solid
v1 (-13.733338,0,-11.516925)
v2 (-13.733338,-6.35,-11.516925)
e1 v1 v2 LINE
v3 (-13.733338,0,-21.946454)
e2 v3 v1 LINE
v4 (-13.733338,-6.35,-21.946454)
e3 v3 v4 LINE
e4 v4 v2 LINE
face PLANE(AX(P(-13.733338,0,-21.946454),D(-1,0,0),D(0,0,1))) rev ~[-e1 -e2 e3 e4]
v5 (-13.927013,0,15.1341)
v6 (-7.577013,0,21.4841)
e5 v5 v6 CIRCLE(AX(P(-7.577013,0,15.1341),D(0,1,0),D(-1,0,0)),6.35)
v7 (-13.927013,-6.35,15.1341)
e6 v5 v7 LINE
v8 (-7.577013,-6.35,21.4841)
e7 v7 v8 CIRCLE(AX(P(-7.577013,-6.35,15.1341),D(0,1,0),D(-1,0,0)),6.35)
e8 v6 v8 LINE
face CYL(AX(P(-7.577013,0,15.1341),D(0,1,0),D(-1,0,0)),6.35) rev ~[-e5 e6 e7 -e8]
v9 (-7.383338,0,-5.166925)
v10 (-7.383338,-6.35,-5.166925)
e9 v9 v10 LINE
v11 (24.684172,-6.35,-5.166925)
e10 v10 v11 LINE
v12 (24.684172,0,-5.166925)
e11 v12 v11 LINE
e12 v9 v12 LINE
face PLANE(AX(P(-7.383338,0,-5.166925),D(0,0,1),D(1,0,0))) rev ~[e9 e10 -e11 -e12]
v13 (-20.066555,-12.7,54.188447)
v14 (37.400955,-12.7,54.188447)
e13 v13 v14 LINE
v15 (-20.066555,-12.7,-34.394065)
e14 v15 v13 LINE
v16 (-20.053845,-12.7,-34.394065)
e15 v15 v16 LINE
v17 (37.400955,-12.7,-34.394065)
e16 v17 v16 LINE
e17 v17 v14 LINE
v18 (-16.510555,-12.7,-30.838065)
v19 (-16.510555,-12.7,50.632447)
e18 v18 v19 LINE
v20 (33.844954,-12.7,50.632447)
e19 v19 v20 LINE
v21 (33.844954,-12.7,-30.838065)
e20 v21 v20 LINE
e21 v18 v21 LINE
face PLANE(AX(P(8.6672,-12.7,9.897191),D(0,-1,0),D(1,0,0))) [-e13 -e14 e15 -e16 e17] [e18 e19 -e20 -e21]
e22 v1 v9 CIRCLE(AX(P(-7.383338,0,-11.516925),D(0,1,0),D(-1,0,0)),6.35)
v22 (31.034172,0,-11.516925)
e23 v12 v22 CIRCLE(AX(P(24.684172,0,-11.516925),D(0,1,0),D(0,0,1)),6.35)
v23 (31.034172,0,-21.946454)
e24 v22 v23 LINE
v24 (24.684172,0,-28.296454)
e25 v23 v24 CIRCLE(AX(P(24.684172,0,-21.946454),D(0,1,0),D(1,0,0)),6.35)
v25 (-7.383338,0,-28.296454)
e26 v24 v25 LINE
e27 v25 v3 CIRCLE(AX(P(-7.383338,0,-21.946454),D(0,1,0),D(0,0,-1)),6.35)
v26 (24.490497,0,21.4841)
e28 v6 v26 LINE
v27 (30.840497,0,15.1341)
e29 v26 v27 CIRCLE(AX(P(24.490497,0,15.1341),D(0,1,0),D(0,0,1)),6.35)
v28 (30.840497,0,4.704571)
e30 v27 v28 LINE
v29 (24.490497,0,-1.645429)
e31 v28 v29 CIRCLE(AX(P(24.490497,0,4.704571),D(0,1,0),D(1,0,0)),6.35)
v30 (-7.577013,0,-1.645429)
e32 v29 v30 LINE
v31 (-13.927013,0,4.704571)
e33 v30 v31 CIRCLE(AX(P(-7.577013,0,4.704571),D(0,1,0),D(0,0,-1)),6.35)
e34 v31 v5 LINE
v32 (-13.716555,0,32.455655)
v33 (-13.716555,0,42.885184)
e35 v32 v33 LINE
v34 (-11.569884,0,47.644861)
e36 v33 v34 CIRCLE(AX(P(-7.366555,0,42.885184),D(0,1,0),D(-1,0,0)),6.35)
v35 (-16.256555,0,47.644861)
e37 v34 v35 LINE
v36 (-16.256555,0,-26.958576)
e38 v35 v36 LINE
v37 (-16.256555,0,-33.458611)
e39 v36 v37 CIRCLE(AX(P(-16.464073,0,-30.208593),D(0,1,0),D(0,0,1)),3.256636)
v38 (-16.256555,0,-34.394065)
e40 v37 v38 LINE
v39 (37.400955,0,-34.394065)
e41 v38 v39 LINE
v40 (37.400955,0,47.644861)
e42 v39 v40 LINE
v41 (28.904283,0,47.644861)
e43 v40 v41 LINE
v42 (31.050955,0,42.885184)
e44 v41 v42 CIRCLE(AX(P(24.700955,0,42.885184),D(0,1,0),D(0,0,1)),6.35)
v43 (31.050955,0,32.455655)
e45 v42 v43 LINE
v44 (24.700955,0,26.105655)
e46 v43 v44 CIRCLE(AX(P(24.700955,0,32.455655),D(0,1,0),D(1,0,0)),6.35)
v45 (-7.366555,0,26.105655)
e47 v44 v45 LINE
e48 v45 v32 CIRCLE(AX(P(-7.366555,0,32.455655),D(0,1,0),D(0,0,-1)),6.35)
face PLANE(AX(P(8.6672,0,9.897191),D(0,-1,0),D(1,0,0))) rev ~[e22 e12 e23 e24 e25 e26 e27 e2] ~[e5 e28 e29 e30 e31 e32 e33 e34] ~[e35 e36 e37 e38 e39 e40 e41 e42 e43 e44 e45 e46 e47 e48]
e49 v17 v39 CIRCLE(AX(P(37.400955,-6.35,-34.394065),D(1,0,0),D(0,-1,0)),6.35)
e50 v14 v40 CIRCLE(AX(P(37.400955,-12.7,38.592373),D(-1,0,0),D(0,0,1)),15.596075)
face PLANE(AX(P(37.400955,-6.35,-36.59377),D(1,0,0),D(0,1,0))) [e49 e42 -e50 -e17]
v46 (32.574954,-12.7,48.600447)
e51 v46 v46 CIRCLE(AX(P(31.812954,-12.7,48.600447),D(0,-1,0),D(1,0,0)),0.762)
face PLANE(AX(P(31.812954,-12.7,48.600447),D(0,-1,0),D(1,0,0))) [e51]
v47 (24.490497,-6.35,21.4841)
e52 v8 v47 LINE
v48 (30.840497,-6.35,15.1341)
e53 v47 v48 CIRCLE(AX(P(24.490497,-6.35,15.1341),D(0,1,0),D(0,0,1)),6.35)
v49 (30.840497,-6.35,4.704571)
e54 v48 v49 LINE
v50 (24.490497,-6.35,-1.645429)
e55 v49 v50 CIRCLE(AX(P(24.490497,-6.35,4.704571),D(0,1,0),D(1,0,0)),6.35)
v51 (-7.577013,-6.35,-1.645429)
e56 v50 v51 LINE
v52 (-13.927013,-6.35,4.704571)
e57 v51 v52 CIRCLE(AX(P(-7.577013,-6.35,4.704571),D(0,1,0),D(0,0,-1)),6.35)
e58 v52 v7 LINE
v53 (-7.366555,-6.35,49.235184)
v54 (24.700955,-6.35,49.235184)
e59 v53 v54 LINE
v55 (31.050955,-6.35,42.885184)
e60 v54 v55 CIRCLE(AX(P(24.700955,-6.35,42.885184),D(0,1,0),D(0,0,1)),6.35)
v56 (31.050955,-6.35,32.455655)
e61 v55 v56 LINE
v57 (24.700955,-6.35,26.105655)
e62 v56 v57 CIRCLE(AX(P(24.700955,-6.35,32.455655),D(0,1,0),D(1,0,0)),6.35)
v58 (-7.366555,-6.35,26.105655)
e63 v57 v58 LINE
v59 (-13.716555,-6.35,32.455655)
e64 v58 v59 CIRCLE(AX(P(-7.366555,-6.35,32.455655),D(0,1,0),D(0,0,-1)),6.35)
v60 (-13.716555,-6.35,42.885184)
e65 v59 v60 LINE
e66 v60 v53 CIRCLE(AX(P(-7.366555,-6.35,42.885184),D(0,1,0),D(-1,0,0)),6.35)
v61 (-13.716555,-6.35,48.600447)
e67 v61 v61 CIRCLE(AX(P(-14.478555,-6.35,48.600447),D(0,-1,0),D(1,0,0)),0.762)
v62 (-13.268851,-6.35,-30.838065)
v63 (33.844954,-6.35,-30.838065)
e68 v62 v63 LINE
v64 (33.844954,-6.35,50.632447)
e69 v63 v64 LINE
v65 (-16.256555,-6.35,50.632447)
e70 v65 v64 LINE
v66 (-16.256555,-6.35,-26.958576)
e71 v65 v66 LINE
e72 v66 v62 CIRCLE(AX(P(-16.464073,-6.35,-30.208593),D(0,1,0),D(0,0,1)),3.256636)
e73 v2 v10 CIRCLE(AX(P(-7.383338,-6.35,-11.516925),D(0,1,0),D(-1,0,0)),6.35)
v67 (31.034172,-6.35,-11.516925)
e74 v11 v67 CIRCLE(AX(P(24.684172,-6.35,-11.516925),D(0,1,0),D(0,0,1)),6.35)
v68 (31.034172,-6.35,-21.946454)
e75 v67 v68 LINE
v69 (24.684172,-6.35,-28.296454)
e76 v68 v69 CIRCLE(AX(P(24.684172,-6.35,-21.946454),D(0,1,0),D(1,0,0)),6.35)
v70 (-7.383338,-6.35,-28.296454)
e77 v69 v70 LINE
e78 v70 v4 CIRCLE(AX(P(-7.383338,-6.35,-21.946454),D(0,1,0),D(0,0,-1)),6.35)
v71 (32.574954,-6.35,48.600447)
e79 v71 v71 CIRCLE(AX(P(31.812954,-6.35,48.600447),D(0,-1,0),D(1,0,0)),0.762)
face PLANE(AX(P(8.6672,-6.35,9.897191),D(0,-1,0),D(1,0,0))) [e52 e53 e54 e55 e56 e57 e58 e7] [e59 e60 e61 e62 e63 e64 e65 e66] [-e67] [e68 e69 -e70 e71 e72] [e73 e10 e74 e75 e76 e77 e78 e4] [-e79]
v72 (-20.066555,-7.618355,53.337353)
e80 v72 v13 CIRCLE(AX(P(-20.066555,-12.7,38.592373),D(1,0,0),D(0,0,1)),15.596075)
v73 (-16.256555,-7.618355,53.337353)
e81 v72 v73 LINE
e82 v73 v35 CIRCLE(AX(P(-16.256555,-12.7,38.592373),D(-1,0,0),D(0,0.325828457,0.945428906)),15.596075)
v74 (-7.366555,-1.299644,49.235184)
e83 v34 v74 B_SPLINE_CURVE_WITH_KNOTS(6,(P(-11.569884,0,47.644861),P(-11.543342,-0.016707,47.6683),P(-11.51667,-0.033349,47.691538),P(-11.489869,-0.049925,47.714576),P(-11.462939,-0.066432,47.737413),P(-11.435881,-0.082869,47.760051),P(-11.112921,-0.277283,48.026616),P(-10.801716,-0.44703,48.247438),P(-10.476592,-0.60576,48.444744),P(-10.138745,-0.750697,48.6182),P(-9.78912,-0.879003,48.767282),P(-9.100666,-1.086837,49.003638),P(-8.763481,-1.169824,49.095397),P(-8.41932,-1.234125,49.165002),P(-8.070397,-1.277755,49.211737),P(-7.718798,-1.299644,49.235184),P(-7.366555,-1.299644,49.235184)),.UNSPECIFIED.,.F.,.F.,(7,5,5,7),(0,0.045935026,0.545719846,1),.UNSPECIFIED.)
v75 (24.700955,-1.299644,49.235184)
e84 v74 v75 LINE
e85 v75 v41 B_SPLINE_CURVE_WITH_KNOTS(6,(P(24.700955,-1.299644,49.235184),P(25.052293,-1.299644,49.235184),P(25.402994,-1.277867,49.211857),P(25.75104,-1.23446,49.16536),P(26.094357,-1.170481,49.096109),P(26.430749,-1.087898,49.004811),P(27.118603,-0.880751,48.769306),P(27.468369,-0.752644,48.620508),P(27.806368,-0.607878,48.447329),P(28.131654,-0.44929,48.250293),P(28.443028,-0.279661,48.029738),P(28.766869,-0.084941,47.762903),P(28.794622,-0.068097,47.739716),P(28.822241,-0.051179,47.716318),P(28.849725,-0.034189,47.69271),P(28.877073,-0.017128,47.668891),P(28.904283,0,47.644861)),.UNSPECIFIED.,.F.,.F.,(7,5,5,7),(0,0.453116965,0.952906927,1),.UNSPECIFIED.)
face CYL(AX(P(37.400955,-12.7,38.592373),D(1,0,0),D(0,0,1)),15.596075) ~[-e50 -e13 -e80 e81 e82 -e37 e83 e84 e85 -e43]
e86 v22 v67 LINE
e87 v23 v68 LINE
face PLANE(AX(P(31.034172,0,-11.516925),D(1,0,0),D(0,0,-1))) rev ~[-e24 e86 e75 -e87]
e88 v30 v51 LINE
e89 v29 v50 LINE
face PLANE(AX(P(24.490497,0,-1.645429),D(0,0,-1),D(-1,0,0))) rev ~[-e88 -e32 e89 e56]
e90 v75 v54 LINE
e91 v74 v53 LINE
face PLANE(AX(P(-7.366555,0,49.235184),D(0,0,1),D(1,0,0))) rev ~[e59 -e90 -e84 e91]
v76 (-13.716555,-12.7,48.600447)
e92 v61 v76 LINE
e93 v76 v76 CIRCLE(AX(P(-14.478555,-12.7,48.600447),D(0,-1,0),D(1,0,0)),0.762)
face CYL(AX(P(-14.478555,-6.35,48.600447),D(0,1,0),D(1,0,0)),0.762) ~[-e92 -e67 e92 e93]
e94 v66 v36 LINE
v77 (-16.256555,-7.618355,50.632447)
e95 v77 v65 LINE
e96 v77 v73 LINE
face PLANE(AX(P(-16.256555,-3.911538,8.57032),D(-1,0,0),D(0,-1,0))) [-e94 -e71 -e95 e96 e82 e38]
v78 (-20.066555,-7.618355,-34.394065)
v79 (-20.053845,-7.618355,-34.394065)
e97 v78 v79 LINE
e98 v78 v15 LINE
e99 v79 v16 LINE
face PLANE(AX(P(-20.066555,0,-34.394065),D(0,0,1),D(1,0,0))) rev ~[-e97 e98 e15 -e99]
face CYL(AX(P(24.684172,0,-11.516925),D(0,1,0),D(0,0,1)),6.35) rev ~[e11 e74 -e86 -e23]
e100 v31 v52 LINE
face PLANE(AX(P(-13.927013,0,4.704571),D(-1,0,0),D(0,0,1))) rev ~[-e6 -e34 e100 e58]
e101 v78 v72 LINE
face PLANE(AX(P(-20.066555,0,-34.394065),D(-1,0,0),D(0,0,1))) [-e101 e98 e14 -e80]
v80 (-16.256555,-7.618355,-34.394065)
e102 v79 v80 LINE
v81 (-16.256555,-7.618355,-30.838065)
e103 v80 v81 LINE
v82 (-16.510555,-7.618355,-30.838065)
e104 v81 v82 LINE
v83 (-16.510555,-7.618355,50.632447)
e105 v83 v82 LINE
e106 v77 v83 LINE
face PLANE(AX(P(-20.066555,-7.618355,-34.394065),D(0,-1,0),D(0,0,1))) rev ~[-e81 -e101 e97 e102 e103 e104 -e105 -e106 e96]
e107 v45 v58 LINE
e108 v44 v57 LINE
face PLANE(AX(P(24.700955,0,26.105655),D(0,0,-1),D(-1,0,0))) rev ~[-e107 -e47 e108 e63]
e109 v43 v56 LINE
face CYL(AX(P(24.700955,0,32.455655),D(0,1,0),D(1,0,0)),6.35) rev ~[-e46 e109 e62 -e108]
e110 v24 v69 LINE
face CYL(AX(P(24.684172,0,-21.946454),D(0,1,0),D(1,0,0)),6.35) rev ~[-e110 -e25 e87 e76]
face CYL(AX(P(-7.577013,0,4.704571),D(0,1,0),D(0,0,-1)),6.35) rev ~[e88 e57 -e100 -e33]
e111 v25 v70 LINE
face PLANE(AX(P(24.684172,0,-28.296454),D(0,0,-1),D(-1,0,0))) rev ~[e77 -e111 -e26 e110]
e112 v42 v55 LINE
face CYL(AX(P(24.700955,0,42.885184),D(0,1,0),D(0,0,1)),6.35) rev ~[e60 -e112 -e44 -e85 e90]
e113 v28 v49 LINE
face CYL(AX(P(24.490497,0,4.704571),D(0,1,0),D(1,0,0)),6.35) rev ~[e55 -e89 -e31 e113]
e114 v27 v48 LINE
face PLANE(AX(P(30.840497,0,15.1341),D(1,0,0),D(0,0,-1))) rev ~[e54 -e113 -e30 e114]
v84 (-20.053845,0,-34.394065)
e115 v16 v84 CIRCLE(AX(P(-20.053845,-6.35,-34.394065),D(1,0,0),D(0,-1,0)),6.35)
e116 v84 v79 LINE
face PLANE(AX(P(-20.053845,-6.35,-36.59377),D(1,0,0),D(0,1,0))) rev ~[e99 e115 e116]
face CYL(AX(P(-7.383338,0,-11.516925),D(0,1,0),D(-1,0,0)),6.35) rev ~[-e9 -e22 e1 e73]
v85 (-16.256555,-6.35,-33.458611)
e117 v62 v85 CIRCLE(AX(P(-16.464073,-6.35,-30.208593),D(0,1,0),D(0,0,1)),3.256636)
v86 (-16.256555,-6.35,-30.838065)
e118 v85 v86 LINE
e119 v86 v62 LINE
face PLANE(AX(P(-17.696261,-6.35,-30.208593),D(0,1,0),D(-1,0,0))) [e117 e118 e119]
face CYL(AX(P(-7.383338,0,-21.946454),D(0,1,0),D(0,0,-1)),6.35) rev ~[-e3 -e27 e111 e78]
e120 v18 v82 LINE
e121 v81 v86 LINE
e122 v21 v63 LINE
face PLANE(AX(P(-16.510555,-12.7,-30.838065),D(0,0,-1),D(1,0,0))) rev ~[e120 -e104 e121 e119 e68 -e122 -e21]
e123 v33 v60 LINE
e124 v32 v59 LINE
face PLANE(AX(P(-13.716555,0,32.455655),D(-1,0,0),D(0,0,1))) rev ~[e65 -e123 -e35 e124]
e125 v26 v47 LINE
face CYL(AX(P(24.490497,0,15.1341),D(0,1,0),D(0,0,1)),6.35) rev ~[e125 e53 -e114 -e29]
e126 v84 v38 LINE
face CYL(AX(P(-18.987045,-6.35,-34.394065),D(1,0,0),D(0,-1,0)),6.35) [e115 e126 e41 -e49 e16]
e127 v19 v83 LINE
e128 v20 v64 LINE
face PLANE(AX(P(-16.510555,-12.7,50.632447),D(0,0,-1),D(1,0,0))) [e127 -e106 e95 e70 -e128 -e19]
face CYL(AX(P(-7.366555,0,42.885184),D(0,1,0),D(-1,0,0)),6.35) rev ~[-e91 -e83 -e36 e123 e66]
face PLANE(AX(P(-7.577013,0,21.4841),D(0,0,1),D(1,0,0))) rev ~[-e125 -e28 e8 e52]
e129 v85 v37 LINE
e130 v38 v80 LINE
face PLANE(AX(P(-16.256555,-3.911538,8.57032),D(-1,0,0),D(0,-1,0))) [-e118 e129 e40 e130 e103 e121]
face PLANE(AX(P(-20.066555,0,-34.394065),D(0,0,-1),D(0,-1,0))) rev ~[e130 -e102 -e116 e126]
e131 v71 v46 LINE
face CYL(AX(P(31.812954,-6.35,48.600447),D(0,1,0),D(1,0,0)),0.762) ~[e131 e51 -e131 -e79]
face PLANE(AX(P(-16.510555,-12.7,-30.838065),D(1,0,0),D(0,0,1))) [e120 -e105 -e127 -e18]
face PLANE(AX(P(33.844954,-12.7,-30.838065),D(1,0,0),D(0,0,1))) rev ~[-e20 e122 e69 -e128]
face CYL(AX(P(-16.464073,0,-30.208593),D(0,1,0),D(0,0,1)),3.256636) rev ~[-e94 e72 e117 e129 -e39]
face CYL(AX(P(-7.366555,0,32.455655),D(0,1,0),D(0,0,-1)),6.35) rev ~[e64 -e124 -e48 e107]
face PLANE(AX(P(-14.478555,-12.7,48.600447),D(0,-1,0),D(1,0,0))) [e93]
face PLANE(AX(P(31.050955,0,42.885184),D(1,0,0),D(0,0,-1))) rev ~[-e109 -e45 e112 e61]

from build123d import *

# Parameters (mm, degrees)
F0_W      = 57.4675095904
F0_H      = 88.5825127872
F1_DEPTH  = 12.7
F3_DEPTH  = 57.4685095904
F4_W      = 50.3555086569
F4_H      = 81.4705118537
F5_DEPTH  = 6.35
F6_R      = 0.7619995332
F8_DEPTH  = 6.35
F11_DEPTH = 56.388
F12_DEPTH = 1.0668
F15_DEPTH = 6.35
F16_DEPTH = 3.81


# Not quite as in the source:
# - a feature of the source that left no trace in its solid (it failed there, or was rolled back) is left out


with BuildPart() as f1:
    # F0 (on Front) → F1 (new body)
    with BuildSketch(Plane.XZ):
        with Locations((8.6671997911, 9.8971910775)):
            Rectangle(F0_W, F0_H)
        with BuildLine():
            ThreePointArc((-13.7333380541, -11.5169252571), (-11.8734661146, -7.0267971965), (-7.3833380541, -5.1669252571))
            Line((-7.3833380541, -5.1669252571), (24.6841715364, -5.1669252571))
            ThreePointArc((24.6841715364, -5.1669252571), (29.1742995969, -7.0267971965), (31.0341715364, -11.5169252571))
            Line((31.0341715364, -11.5169252571), (31.0341715364, -21.9464536455))
            ThreePointArc((31.0341715364, -21.9464536455), (29.1742995969, -26.436581706), (24.6841715364, -28.2964536455))
            Line((24.6841715364, -28.2964536455), (-7.3833380541, -28.2964536455))
            ThreePointArc((-7.3833380541, -28.2964536455), (-11.8734661146, -26.436581706), (-13.7333380541, -21.9464536455))
            Line((-13.7333380541, -21.9464536455), (-13.7333380541, -11.5169252571))
        make_face(mode=Mode.SUBTRACT)
        with BuildLine():
            ThreePointArc((-13.9270129099, 15.1340997942), (-12.0671409704, 19.6242278547), (-7.5770129099, 21.4840997942))
            Line((-7.5770129099, 21.4840997942), (24.4904966805, 21.4840997942))
            ThreePointArc((24.4904966805, 21.4840997942), (28.980624741, 19.6242278547), (30.8404966805, 15.1340997942))
            Line((30.8404966805, 15.1340997942), (30.8404966805, 4.7045714058))
            ThreePointArc((30.8404966805, 4.7045714058), (28.980624741, 0.2144433453), (24.4904966805, -1.6454285942))
            Line((24.4904966805, -1.6454285942), (-7.5770129099, -1.6454285942))
            ThreePointArc((-7.5770129099, -1.6454285942), (-12.0671409704, 0.2144433453), (-13.9270129099, 4.7045714058))
            Line((-13.9270129099, 4.7045714058), (-13.9270129099, 15.1340997942))
        make_face(mode=Mode.SUBTRACT)
        with BuildLine():
            ThreePointArc((-13.7165550041, 42.8851837456), (-11.8566830647, 47.3753118062), (-7.3665550041, 49.2351837456))
            Line((-7.3665550041, 49.2351837456), (24.7009545863, 49.2351837456))
            ThreePointArc((24.7009545863, 49.2351837456), (29.1910826468, 47.3753118062), (31.0509545863, 42.8851837456))
            Line((31.0509545863, 42.8851837456), (31.0509545863, 32.4556553572))
            ThreePointArc((31.0509545863, 32.4556553572), (29.1910826468, 27.9655272967), (24.7009545863, 26.1056553572))
            Line((24.7009545863, 26.1056553572), (-7.3665550041, 26.1056553572))
            ThreePointArc((-7.3665550041, 26.1056553572), (-11.8566830647, 27.9655272967), (-13.7165550041, 32.4556553572))
            Line((-13.7165550041, 32.4556553572), (-13.7165550041, 42.8851837456))
        make_face(mode=Mode.SUBTRACT)
    extrude(amount=F1_DEPTH)

    # F2 (on face) → F3 (cut, through all)
    with BuildSketch(Plane.YZ.offset(37.4009545863)):
        with BuildLine():
            ThreePointArc((-12.7, 54.1884474711), (-5.5566722855, 52.456369837), (0, 47.6448610425))
            Line((0, 47.6448610425), (0, 54.1884474711))
            Line((0, 54.1884474711), (-12.7, 54.1884474711))
        make_face()
    extrude(amount=-F3_DEPTH, mode=Mode.SUBTRACT)

    # F4 (on face) → F5 (cut)
    with BuildSketch(Plane.XZ.offset(12.7)):
        with Locations((8.6671997911, 9.8971910775)):
            Rectangle(F4_W, F4_H)
        with BuildLine():
            Line((-13.7333380541, -21.9464536455), (-13.7333380541, -11.5169252571))
            ThreePointArc((-13.7333380541, -11.5169252571), (-11.8734661146, -7.0267971965), (-7.3833380541, -5.1669252571))
            Line((-7.3833380541, -5.1669252571), (24.6841715364, -5.1669252571))
            ThreePointArc((24.6841715364, -5.1669252571), (29.1742995969, -7.0267971965), (31.0341715364, -11.5169252571))
            Line((31.0341715364, -11.5169252571), (31.0341715364, -21.9464536455))
            ThreePointArc((31.0341715364, -21.9464536455), (29.1742995969, -26.436581706), (24.6841715364, -28.2964536455))
            Line((24.6841715364, -28.2964536455), (-7.3833380541, -28.2964536455))
            ThreePointArc((-7.3833380541, -28.2964536455), (-11.8734661146, -26.436581706), (-13.7333380541, -21.9464536455))
        make_face(mode=Mode.SUBTRACT)
        with BuildLine():
            Line((24.4904966805, -1.6454285942), (-7.5770129099, -1.6454285942))
            ThreePointArc((-7.5770129099, -1.6454285942), (-12.0671409704, 0.2144433453), (-13.9270129099, 4.7045714058))
            Line((-13.9270129099, 4.7045714058), (-13.9270129099, 15.1340997942))
            ThreePointArc((-13.9270129099, 15.1340997942), (-12.0671409704, 19.6242278547), (-7.5770129099, 21.4840997942))
            Line((-7.5770129099, 21.4840997942), (24.4904966805, 21.4840997942))
            ThreePointArc((24.4904966805, 21.4840997942), (28.980624741, 19.6242278547), (30.8404966805, 15.1340997942))
            Line((30.8404966805, 15.1340997942), (30.8404966805, 4.7045714058))
            ThreePointArc((30.8404966805, 4.7045714058), (28.980624741, 0.2144433453), (24.4904966805, -1.6454285942))
        make_face(mode=Mode.SUBTRACT)
        with BuildLine():
            ThreePointArc((-7.3665550041, 26.1056553572), (-11.8566830647, 27.9655272967), (-13.7165550041, 32.4556553572))
            Line((-13.7165550041, 32.4556553572), (-13.7165550041, 42.8851837456))
            ThreePointArc((-13.7165550041, 42.8851837456), (-11.8566830647, 47.3753118062), (-7.3665550041, 49.2351837456))
            Line((-7.3665550041, 49.2351837456), (24.7009545863, 49.2351837456))
            ThreePointArc((24.7009545863, 49.2351837456), (29.1910826468, 47.3753118062), (31.0509545863, 42.8851837456))
            Line((31.0509545863, 42.8851837456), (31.0509545863, 32.4556553572))
            ThreePointArc((31.0509545863, 32.4556553572), (29.1910826468, 27.9655272967), (24.7009545863, 26.1056553572))
            Line((24.7009545863, 26.1056553572), (-7.3665550041, 26.1056553572))
        make_face(mode=Mode.SUBTRACT)
    extrude(amount=-F5_DEPTH, mode=Mode.SUBTRACT)

    # F6 (on face) → F8 (join)
    with BuildSketch(Plane.XZ.offset(6.35)):
        with Locations((-14.4785545374, 48.6004470043)):
            Circle(F6_R)
        with Locations((31.8129541195, 48.6004470043)):
            Circle(F6_R)
    extrude(amount=F8_DEPTH)

    # F10 (on face) → F11 (join)
    with BuildSketch(Plane.YZ.offset(37.4009545863)):
        with BuildLine():
            Line((0, -34.3940653161), (-12.7, -34.3940653161))
            ThreePointArc((-12.7, -34.3940653161), (-6.35, -40.7440653161), (0, -34.3940653161))
        make_face()
    extrude(amount=-F11_DEPTH)

    # F12 (add): a face of the model
    f12_faces = [f1.faces().sort_by_distance(p)[0] for p in [
        (-18.9870454137, -6.35, -37.0890890192),
    ]]
    extrude(f12_faces, amount=F12_DEPTH)

    # F14 (on face) → F15 (cut)
    with BuildSketch(Plane(origin=(0, 0, 0), x_dir=(-1, 0, 0), z_dir=(0, 1, 0))):
        with BuildLine():
            Line((16.464073211, -26.9519573744), (16.464073211, -33.4652290945))
            ThreePointArc((16.464073211, -33.4652290945), (18.7668625115, -32.5113825349), (19.720709071, -30.2085932344))
            ThreePointArc((19.720709071, -30.2085932344), (18.7668625115, -27.9058039339), (16.464073211, -26.9519573744))
        make_face()
        with BuildLine():
            ThreePointArc((16.464073211, -26.9519573744), (13.2074373509, -30.2085932344), (16.464073211, -33.4652290945))
            Line((16.464073211, -33.4652290945), (16.464073211, -26.9519573744))
        make_face()
    extrude(amount=-F15_DEPTH, mode=Mode.SUBTRACT)

    # F13 (on face) → F16 (cut)
    with BuildSketch(Plane(origin=(-20.0665550041, 0, 0), x_dir=(0, -1, 0), z_dir=(-1, 0, 0))):
        with BuildLine():
            Line((0, -34.3940653161), (7.6183550991, -34.3940653161))
            Line((7.6183550991, -34.3940653161), (7.6183550991, 53.3373526242))
            ThreePointArc((7.6183550991, 53.3373526242), (3.3646993114, 51.0859593692), (0, 47.6448610425))
            Line((0, 47.6448610425), (0, -34.3940653161))
        make_face()
    extrude(amount=-F16_DEPTH, mode=Mode.SUBTRACT)


solid = f1.part
